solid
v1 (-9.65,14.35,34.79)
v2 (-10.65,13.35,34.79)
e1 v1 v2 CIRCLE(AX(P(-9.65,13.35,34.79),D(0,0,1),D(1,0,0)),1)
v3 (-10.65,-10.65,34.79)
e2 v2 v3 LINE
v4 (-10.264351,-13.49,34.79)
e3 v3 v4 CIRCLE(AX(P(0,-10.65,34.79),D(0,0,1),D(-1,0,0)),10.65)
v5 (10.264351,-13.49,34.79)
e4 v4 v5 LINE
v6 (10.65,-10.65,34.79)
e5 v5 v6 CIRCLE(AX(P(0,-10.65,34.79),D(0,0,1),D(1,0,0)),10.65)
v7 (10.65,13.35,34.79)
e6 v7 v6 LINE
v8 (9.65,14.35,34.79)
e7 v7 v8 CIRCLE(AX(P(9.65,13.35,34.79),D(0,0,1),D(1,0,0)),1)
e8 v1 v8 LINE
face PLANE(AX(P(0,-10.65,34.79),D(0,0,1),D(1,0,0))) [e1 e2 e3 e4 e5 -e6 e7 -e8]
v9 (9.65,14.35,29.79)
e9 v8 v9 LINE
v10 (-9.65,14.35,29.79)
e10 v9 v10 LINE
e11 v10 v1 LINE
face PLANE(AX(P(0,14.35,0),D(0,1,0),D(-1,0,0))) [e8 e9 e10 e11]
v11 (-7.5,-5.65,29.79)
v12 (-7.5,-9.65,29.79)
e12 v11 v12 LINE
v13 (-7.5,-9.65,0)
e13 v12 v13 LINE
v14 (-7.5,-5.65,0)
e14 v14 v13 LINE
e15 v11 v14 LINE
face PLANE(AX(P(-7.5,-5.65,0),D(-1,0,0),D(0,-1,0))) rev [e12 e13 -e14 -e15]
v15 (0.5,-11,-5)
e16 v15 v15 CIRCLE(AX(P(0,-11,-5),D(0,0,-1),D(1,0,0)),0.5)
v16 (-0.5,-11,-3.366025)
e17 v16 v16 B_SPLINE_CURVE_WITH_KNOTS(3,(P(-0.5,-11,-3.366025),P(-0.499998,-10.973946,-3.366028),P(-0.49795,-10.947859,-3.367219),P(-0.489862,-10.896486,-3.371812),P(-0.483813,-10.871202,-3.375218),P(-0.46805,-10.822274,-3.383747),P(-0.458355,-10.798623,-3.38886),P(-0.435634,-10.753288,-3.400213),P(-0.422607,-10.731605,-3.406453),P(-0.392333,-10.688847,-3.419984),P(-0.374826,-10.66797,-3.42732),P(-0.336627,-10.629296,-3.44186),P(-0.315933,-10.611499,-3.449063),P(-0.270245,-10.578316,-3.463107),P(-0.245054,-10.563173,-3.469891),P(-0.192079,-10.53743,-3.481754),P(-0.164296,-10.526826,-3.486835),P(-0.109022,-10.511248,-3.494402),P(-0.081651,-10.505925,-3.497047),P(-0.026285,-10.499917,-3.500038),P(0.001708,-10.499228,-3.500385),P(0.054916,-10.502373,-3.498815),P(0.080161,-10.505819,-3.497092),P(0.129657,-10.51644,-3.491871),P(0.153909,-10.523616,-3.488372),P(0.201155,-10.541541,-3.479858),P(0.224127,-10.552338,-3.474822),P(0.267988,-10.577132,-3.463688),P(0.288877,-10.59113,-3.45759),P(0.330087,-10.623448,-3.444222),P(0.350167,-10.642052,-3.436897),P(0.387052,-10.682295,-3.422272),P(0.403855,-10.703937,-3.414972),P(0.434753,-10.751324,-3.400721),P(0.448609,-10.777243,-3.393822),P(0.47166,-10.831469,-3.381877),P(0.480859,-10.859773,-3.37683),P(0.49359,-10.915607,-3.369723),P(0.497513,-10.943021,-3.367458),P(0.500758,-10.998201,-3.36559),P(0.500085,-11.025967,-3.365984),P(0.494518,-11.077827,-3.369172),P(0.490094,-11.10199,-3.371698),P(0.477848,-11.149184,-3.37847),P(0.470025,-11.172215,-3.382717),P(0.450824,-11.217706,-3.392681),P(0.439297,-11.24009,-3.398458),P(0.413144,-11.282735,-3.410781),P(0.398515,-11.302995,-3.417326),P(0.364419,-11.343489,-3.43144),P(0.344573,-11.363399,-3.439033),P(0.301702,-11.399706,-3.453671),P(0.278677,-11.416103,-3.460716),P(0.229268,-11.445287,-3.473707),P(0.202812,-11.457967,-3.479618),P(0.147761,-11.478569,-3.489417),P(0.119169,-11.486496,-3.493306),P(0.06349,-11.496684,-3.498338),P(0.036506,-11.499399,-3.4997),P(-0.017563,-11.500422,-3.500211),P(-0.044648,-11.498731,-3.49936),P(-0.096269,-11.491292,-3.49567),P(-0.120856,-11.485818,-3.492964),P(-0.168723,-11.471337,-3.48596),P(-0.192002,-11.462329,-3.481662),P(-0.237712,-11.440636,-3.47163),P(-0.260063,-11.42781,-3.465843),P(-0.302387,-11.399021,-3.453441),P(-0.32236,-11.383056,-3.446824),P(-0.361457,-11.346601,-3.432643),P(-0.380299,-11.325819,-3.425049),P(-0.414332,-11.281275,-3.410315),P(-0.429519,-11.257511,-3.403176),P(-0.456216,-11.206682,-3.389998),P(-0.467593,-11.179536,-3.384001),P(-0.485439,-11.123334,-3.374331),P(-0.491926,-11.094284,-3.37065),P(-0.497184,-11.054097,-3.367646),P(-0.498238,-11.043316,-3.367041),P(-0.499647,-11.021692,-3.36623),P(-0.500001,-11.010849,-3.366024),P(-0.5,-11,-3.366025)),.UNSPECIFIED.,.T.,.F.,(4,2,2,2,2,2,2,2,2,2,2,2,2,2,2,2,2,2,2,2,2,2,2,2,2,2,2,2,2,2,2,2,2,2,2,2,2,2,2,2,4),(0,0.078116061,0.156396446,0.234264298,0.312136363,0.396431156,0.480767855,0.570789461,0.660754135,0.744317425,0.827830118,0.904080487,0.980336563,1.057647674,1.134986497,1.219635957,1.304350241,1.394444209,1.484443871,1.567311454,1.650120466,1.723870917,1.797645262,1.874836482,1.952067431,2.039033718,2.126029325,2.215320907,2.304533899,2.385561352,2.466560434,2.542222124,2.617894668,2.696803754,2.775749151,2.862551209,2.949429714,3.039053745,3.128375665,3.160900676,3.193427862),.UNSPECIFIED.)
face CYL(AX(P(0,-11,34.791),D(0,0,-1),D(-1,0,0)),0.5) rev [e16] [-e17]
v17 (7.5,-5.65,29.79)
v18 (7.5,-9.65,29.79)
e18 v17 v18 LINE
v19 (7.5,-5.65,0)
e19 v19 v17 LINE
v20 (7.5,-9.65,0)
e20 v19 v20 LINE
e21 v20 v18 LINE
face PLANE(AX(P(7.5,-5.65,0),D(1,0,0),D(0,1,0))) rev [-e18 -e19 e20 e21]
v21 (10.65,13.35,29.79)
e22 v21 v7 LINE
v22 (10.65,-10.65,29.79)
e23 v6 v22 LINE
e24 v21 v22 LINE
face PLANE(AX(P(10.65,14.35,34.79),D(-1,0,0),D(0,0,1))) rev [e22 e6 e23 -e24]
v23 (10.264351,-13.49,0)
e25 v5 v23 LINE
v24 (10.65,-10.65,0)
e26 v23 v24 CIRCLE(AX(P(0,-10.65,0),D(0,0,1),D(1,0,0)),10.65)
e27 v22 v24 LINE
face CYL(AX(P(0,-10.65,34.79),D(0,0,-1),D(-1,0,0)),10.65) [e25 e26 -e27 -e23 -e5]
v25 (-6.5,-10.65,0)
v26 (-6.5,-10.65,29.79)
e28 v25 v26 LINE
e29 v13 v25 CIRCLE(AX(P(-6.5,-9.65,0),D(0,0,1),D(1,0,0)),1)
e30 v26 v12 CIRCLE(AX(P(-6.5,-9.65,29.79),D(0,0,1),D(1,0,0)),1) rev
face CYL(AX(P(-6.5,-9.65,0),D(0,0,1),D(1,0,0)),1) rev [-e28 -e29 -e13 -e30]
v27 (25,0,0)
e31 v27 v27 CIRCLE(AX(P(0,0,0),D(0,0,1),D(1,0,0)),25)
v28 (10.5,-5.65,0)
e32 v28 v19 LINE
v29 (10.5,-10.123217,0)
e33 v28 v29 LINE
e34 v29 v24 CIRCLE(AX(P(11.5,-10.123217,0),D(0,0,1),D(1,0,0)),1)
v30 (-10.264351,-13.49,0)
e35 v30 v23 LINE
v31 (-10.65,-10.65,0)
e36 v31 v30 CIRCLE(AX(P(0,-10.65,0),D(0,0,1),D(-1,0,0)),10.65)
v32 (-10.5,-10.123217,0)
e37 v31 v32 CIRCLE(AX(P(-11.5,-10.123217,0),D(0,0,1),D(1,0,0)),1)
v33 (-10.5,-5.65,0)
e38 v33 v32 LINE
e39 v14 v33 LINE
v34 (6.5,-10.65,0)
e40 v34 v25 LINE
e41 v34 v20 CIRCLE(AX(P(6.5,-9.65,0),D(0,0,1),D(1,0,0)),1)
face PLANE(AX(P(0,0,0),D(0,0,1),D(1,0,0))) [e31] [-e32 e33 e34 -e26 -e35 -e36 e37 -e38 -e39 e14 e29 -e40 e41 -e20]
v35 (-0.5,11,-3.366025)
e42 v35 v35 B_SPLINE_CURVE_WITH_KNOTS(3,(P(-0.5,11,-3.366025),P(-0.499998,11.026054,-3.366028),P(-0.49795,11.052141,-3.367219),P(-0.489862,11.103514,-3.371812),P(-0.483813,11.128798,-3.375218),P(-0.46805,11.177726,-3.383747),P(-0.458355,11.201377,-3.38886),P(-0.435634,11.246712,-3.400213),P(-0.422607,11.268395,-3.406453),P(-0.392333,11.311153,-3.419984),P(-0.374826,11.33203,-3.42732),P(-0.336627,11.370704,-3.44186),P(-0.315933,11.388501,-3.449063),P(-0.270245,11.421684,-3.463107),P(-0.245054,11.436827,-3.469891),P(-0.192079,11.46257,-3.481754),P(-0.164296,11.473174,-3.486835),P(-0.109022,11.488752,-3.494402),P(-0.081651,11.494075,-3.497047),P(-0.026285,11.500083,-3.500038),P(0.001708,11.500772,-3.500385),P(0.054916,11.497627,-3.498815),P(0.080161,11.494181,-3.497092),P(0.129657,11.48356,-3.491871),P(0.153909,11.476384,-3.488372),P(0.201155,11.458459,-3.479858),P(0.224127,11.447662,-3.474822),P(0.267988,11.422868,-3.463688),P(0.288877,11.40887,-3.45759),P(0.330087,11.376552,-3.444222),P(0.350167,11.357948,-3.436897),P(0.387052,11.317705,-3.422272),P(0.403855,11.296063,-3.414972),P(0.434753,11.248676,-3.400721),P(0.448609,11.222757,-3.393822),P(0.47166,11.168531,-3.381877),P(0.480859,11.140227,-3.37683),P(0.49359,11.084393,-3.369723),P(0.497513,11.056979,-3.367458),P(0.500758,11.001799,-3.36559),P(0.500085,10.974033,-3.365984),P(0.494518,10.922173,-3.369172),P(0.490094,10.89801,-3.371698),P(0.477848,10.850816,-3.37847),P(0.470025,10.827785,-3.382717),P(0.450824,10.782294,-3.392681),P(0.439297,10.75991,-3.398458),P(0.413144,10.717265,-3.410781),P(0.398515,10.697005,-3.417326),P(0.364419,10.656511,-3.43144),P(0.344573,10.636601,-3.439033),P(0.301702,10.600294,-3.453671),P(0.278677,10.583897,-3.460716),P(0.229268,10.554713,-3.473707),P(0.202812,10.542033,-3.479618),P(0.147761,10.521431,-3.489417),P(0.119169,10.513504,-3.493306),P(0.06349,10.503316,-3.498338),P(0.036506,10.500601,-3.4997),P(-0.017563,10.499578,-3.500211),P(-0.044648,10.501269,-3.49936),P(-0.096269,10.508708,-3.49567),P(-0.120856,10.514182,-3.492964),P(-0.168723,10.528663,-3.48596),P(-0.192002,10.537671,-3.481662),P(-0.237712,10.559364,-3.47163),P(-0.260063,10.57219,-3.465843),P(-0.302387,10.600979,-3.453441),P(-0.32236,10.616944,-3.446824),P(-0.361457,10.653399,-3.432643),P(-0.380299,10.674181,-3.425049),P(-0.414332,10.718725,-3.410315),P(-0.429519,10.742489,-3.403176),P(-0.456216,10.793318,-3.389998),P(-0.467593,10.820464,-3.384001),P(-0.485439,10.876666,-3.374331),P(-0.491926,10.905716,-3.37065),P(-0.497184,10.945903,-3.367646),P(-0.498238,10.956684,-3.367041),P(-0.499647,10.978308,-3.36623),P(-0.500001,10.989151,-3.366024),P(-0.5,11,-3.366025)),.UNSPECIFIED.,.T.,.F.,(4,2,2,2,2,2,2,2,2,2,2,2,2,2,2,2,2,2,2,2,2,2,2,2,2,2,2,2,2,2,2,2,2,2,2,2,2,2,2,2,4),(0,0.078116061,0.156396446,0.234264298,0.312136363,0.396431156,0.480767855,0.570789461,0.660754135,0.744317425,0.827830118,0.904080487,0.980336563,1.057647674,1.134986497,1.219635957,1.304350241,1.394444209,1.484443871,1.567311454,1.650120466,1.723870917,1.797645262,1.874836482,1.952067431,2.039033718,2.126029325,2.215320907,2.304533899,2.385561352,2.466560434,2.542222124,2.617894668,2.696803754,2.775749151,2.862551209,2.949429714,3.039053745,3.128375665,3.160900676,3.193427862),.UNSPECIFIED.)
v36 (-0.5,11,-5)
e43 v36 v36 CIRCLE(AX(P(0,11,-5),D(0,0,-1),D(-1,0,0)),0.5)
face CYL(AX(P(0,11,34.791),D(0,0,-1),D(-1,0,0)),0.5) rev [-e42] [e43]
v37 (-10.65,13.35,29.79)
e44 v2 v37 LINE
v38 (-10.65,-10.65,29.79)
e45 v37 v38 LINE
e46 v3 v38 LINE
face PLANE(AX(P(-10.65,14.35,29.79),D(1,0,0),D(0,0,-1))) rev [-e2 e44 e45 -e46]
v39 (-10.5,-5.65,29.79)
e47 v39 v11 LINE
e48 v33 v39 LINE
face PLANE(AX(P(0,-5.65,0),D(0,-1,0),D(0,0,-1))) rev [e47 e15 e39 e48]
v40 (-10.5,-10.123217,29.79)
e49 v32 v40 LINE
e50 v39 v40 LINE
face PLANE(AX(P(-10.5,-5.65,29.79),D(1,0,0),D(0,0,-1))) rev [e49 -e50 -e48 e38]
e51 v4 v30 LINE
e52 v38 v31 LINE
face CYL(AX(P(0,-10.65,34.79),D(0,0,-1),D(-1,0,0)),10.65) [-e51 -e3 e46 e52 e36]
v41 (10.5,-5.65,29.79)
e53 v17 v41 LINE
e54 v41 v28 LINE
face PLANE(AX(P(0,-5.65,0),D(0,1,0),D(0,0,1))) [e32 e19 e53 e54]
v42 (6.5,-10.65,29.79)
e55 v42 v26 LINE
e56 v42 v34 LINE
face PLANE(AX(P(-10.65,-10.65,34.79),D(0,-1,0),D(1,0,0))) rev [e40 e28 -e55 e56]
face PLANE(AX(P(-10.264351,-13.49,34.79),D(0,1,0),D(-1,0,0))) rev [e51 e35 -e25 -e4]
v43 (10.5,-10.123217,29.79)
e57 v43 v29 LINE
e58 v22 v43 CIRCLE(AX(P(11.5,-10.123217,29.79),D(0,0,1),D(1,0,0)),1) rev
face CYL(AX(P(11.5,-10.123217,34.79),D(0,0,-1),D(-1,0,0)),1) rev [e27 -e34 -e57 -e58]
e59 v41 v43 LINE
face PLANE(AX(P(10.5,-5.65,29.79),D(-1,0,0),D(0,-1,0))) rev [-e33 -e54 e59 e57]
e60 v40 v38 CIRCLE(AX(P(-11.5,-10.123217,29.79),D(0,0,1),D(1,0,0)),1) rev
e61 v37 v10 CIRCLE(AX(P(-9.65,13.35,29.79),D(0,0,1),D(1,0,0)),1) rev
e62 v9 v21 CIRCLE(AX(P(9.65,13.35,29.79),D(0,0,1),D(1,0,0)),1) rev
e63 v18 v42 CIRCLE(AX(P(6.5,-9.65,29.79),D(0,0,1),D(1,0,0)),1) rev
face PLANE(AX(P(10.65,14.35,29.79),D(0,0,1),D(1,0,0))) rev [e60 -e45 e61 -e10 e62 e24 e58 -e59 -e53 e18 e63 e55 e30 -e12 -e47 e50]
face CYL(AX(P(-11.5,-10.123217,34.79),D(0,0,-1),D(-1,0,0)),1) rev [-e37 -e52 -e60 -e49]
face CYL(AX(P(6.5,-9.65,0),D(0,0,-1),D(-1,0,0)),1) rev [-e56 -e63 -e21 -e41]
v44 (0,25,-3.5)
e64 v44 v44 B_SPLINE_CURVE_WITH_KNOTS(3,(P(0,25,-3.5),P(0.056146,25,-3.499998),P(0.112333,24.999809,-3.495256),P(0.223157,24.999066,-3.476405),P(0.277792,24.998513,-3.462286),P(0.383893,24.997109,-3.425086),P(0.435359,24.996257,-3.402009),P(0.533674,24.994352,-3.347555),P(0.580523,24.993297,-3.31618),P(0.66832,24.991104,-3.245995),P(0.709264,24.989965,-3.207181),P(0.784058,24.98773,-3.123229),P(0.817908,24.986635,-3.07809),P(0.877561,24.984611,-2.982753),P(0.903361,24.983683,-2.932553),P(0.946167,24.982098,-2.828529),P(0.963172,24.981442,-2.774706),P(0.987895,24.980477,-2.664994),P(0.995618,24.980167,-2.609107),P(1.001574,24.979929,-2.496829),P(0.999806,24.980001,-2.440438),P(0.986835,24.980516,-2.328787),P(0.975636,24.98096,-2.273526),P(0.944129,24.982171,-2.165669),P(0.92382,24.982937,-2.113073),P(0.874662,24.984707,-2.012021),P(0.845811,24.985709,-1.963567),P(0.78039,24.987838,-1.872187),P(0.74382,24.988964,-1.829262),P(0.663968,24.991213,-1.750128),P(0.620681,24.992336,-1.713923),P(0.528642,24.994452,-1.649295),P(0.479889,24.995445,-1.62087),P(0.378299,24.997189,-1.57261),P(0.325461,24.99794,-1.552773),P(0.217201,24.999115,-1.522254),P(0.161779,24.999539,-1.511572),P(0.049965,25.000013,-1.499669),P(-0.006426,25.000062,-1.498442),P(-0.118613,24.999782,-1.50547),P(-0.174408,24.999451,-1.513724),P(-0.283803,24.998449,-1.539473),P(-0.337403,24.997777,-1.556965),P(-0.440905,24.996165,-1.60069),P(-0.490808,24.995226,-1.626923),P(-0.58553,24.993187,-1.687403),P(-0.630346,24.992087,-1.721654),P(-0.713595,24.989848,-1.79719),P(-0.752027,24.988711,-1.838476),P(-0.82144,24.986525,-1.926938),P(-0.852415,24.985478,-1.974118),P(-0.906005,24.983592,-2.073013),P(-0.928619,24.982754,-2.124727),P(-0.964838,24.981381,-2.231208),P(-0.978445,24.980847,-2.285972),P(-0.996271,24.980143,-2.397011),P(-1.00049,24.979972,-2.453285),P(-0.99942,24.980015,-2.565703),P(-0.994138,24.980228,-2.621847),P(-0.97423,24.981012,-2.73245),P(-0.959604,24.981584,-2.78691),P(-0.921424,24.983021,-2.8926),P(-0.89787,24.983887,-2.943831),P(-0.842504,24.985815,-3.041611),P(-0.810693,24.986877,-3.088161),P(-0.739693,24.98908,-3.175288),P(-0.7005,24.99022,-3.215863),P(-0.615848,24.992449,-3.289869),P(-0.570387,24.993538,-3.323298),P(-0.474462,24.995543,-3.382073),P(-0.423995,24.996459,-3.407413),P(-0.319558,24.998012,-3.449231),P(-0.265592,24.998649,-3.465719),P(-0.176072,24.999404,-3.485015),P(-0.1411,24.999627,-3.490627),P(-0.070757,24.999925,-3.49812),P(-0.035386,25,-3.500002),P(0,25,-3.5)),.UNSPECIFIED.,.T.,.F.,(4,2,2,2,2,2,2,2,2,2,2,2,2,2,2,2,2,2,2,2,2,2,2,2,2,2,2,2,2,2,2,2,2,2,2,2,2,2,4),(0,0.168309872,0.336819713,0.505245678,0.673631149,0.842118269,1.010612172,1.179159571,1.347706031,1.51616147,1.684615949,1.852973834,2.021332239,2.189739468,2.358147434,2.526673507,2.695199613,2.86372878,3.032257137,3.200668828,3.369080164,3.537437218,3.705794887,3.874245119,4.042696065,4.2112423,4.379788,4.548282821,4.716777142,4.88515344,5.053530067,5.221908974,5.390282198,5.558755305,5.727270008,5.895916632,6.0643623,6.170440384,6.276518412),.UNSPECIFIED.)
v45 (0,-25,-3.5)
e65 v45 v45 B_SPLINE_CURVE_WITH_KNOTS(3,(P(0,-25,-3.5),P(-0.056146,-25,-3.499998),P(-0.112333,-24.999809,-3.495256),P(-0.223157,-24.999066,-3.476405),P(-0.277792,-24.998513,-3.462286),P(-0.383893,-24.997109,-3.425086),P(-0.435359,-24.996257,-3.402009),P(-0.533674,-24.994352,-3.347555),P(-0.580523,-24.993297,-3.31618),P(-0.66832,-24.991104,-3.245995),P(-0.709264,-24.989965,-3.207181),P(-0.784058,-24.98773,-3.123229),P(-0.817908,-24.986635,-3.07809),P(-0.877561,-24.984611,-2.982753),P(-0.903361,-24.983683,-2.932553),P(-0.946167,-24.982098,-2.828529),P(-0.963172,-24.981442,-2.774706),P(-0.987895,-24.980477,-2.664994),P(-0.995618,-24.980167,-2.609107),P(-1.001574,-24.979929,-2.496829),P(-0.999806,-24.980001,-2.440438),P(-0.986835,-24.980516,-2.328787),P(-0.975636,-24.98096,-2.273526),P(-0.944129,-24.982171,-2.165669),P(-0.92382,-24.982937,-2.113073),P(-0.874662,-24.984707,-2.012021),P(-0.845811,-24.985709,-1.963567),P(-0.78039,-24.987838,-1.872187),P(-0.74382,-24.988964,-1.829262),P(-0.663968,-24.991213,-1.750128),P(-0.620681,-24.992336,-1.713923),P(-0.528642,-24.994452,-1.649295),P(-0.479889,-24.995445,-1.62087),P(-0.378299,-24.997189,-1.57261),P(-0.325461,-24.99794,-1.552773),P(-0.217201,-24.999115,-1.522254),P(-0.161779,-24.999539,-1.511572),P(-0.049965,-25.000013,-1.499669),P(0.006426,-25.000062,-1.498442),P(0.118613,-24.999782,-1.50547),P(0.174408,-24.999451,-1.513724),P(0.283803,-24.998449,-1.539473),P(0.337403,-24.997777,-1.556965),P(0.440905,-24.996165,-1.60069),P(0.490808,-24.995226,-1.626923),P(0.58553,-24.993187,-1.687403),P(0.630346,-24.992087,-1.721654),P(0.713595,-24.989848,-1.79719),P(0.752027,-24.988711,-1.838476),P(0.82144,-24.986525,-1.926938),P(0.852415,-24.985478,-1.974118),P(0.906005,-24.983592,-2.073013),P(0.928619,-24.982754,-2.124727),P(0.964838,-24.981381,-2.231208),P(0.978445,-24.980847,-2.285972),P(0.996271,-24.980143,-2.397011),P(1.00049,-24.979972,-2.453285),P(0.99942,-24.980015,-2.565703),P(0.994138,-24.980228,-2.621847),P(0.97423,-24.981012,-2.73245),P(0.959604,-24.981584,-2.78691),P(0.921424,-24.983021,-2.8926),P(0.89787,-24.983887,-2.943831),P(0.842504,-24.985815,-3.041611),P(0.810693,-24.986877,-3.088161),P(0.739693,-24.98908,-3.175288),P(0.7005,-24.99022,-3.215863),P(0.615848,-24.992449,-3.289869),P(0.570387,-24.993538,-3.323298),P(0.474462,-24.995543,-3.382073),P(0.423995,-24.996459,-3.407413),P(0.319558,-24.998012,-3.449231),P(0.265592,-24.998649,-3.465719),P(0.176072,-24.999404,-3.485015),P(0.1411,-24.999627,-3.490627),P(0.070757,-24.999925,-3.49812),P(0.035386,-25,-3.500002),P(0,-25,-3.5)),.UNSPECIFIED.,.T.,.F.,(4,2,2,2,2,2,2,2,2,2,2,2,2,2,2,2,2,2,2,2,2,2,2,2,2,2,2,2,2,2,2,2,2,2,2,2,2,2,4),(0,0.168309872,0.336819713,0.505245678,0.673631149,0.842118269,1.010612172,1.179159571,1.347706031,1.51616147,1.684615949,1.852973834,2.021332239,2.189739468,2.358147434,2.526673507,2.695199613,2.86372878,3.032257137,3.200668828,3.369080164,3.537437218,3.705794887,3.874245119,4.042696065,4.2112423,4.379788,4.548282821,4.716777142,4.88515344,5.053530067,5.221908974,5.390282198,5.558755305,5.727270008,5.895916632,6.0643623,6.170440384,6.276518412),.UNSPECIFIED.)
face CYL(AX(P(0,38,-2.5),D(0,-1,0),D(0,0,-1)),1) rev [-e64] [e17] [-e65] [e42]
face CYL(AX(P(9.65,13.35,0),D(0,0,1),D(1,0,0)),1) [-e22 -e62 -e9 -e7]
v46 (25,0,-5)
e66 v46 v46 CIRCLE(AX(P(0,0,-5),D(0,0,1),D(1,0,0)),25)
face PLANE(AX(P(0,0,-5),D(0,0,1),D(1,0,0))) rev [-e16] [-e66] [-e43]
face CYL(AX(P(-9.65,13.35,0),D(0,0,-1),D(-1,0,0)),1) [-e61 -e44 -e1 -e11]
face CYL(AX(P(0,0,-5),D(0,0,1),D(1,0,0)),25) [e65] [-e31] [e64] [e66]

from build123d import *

# Parameters (mm, degrees)
SKETCH1_R               = 25
BOSS_EXTRUDE1_DEPTH     = 5
BOSS_EXTRUDE2_DEPTH     = 34.79
SKETCH3_W               = 21.3
SKETCH3_H               = 5
BOSS_EXTRUDE3_DEPTH     = 25
SKETCH4_W               = 3
SKETCH4_H               = 29.79
BOSS_EXTRUDE5_DEPTH     = 5
CUT_EXTRUDE1_DEPTH      = 38
CUT_EXTRUDE1_DEPTH_BACK = 50.601855812
SKETCH5_R               = 1
FILLET1_R               = 1
FILLET2_R               = 1
FILLET3_R               = 1
CUT_EXTRUDE2_REACH      = 55.228
CUT_EXTRUDE2_END_RADIUS = 1
SKETCH6_R               = 0.5


with BuildPart() as part:
    # Sketch1 → Boss-Extrude1 (new body)
    with BuildSketch(Plane.XY):
        Circle(SKETCH1_R)
    extrude(amount=-BOSS_EXTRUDE1_DEPTH)

    # Sketch2 → Boss-Extrude2 (add)
    with BuildSketch(Plane.XY):
        with BuildLine():
            Line((-10.65, -10.65), (10.65, -10.65))
            ThreePointArc((10.65, -10.65), (10.553147336, -12.083032205), (10.264350929, -13.49))
            Line((10.264350929, -13.49), (-10.264350929, -13.49))
            ThreePointArc((-10.264350929, -13.49), (-10.553147336, -12.083032205), (-10.65, -10.65))
        make_face()
    extrude(amount=BOSS_EXTRUDE2_DEPTH)

    # Sketch3 → Boss-Extrude3 (add)
    with BuildSketch(Plane(origin=(0, -10.65, 0), x_dir=(1, 0, 0), z_dir=(0, 1, 0))):
        with Locations((0, -32.29)):
            Rectangle(SKETCH3_W, SKETCH3_H)
    extrude(amount=BOSS_EXTRUDE3_DEPTH)

    # Sketch4 → Boss-Extrude5 (add)
    with BuildSketch(Plane(origin=(0, -10.65, 0), x_dir=(1, 0, 0), z_dir=(0, 1, 0))):
        with Locations((9, -14.895)):
            Rectangle(SKETCH4_W, SKETCH4_H)
        with Locations((-9, -14.895)):
            Rectangle(SKETCH4_W, SKETCH4_H)
    extrude(amount=BOSS_EXTRUDE5_DEPTH)

    # Sketch5 → Cut-Extrude1 (cut, two sides: drawn at the far end of the back side and taken through both)
    with BuildSketch(Plane(origin=(0, 0, 0), x_dir=(1, 0, 0), z_dir=(0, 1, 0)).offset(-CUT_EXTRUDE1_DEPTH_BACK)):
        with Locations(Location((0, 2.5, 0), (0, 0, 90))):
            Circle(SKETCH5_R)
    extrude(amount=CUT_EXTRUDE1_DEPTH + CUT_EXTRUDE1_DEPTH_BACK, mode=Mode.SUBTRACT)

    # Fillet1
    fillet1_edges = [part.edges().sort_by_distance(p)[0] for p in [
        (10.65, 14.35, 32.29),
        (-10.65, 14.35, 32.29),
    ]]
    fillet(fillet1_edges, radius=FILLET1_R)

    # Fillet2
    fillet2_edges = [part.edges().sort_by_distance(p)[0] for p in [
        (7.5, -10.65, 14.895),
        (-7.5, -10.65, 14.895),
    ]]
    fillet(fillet2_edges, radius=FILLET2_R)

    # Fillet3
    # the kernel refuses this fillet: 1 mm, written as the material it adds along each edge
    with BuildSketch(Plane(origin=(10.5, -10.65, 31.106956719), x_dir=(0, 1, 0), z_dir=(0, 0, -1))) as fillet3_piece_1:
        with BuildLine():
            CenterArc((0.526782688, 1), FILLET3_R, 238.211669382, 31.788330618)
            Line((0, 0.15), (-0.010535654, 0.133))
            ThreePointArc((-0.010535654, 0.133), (-0.02, 0.075), (-0.02, 0))
            Line((-0.02, 0), (0, -0.02))
            Line((0, -0.02), (0.526782688, -0.02))
            Line((0.526782688, -0.02), (0.526782688, 0))
        make_face()
    extrude(amount=32.423913438)
    with BuildSketch(Plane(origin=(-10.5, -10.65, 31.106956719), x_dir=(0, 1, 0), z_dir=(0, 0, -1))) as fillet3_piece_2:
        with BuildLine():
            CenterArc((0.526782688, -1), FILLET3_R, 90, 31.788330618)
            Line((0, -0.15), (-0.010535654, -0.133))
            ThreePointArc((-0.010535654, -0.133), (-0.02, -0.075), (-0.02, 0))
            Line((-0.02, 0), (0, 0.02))
            Line((0, 0.02), (0.526782688, 0.02))
            Line((0.526782688, 0.02), (0.526782688, 0))
        make_face()
    extrude(amount=32.423913438)

    # Cut-Extrude2: up to this cylinder (the profile starts outside it)
    cut_extrude2_end = Plane(origin=(0, 0, -2.5), z_dir=(0, -1, 0)) * Cylinder(CUT_EXTRUDE2_END_RADIUS, 135.456, mode=Mode.PRIVATE)
    # Sketch6 → Cut-Extrude2 (cut, up to the surface)
    with BuildSketch(Plane(origin=(0, 0, -5), x_dir=(-1, 0, 0), z_dir=(0, 0, -1)), mode=Mode.PRIVATE) as cut_extrude2_sk1:
        with Locations((0, 11)):
            Circle(SKETCH6_R)
    cut_extrude2_tool1 = extrude(cut_extrude2_sk1.sketch, amount=-CUT_EXTRUDE2_REACH, mode=Mode.PRIVATE) - cut_extrude2_end
    add(cut_extrude2_tool1.solids().sort_by_distance((0, 11, -5))[0], mode=Mode.SUBTRACT)
    # Sketch6 → Cut-Extrude2 (cut, up to the surface)
    with BuildSketch(Plane(origin=(0, 0, -5), x_dir=(-1, 0, 0), z_dir=(0, 0, -1)), mode=Mode.PRIVATE) as cut_extrude2_sk2:
        with Locations((0, -11)):
            Circle(SKETCH6_R)
    cut_extrude2_tool2 = extrude(cut_extrude2_sk2.sketch, amount=-CUT_EXTRUDE2_REACH, mode=Mode.PRIVATE) - cut_extrude2_end
    add(cut_extrude2_tool2.solids().sort_by_distance((0, -11, -5))[0], mode=Mode.SUBTRACT)


solid = part.part
